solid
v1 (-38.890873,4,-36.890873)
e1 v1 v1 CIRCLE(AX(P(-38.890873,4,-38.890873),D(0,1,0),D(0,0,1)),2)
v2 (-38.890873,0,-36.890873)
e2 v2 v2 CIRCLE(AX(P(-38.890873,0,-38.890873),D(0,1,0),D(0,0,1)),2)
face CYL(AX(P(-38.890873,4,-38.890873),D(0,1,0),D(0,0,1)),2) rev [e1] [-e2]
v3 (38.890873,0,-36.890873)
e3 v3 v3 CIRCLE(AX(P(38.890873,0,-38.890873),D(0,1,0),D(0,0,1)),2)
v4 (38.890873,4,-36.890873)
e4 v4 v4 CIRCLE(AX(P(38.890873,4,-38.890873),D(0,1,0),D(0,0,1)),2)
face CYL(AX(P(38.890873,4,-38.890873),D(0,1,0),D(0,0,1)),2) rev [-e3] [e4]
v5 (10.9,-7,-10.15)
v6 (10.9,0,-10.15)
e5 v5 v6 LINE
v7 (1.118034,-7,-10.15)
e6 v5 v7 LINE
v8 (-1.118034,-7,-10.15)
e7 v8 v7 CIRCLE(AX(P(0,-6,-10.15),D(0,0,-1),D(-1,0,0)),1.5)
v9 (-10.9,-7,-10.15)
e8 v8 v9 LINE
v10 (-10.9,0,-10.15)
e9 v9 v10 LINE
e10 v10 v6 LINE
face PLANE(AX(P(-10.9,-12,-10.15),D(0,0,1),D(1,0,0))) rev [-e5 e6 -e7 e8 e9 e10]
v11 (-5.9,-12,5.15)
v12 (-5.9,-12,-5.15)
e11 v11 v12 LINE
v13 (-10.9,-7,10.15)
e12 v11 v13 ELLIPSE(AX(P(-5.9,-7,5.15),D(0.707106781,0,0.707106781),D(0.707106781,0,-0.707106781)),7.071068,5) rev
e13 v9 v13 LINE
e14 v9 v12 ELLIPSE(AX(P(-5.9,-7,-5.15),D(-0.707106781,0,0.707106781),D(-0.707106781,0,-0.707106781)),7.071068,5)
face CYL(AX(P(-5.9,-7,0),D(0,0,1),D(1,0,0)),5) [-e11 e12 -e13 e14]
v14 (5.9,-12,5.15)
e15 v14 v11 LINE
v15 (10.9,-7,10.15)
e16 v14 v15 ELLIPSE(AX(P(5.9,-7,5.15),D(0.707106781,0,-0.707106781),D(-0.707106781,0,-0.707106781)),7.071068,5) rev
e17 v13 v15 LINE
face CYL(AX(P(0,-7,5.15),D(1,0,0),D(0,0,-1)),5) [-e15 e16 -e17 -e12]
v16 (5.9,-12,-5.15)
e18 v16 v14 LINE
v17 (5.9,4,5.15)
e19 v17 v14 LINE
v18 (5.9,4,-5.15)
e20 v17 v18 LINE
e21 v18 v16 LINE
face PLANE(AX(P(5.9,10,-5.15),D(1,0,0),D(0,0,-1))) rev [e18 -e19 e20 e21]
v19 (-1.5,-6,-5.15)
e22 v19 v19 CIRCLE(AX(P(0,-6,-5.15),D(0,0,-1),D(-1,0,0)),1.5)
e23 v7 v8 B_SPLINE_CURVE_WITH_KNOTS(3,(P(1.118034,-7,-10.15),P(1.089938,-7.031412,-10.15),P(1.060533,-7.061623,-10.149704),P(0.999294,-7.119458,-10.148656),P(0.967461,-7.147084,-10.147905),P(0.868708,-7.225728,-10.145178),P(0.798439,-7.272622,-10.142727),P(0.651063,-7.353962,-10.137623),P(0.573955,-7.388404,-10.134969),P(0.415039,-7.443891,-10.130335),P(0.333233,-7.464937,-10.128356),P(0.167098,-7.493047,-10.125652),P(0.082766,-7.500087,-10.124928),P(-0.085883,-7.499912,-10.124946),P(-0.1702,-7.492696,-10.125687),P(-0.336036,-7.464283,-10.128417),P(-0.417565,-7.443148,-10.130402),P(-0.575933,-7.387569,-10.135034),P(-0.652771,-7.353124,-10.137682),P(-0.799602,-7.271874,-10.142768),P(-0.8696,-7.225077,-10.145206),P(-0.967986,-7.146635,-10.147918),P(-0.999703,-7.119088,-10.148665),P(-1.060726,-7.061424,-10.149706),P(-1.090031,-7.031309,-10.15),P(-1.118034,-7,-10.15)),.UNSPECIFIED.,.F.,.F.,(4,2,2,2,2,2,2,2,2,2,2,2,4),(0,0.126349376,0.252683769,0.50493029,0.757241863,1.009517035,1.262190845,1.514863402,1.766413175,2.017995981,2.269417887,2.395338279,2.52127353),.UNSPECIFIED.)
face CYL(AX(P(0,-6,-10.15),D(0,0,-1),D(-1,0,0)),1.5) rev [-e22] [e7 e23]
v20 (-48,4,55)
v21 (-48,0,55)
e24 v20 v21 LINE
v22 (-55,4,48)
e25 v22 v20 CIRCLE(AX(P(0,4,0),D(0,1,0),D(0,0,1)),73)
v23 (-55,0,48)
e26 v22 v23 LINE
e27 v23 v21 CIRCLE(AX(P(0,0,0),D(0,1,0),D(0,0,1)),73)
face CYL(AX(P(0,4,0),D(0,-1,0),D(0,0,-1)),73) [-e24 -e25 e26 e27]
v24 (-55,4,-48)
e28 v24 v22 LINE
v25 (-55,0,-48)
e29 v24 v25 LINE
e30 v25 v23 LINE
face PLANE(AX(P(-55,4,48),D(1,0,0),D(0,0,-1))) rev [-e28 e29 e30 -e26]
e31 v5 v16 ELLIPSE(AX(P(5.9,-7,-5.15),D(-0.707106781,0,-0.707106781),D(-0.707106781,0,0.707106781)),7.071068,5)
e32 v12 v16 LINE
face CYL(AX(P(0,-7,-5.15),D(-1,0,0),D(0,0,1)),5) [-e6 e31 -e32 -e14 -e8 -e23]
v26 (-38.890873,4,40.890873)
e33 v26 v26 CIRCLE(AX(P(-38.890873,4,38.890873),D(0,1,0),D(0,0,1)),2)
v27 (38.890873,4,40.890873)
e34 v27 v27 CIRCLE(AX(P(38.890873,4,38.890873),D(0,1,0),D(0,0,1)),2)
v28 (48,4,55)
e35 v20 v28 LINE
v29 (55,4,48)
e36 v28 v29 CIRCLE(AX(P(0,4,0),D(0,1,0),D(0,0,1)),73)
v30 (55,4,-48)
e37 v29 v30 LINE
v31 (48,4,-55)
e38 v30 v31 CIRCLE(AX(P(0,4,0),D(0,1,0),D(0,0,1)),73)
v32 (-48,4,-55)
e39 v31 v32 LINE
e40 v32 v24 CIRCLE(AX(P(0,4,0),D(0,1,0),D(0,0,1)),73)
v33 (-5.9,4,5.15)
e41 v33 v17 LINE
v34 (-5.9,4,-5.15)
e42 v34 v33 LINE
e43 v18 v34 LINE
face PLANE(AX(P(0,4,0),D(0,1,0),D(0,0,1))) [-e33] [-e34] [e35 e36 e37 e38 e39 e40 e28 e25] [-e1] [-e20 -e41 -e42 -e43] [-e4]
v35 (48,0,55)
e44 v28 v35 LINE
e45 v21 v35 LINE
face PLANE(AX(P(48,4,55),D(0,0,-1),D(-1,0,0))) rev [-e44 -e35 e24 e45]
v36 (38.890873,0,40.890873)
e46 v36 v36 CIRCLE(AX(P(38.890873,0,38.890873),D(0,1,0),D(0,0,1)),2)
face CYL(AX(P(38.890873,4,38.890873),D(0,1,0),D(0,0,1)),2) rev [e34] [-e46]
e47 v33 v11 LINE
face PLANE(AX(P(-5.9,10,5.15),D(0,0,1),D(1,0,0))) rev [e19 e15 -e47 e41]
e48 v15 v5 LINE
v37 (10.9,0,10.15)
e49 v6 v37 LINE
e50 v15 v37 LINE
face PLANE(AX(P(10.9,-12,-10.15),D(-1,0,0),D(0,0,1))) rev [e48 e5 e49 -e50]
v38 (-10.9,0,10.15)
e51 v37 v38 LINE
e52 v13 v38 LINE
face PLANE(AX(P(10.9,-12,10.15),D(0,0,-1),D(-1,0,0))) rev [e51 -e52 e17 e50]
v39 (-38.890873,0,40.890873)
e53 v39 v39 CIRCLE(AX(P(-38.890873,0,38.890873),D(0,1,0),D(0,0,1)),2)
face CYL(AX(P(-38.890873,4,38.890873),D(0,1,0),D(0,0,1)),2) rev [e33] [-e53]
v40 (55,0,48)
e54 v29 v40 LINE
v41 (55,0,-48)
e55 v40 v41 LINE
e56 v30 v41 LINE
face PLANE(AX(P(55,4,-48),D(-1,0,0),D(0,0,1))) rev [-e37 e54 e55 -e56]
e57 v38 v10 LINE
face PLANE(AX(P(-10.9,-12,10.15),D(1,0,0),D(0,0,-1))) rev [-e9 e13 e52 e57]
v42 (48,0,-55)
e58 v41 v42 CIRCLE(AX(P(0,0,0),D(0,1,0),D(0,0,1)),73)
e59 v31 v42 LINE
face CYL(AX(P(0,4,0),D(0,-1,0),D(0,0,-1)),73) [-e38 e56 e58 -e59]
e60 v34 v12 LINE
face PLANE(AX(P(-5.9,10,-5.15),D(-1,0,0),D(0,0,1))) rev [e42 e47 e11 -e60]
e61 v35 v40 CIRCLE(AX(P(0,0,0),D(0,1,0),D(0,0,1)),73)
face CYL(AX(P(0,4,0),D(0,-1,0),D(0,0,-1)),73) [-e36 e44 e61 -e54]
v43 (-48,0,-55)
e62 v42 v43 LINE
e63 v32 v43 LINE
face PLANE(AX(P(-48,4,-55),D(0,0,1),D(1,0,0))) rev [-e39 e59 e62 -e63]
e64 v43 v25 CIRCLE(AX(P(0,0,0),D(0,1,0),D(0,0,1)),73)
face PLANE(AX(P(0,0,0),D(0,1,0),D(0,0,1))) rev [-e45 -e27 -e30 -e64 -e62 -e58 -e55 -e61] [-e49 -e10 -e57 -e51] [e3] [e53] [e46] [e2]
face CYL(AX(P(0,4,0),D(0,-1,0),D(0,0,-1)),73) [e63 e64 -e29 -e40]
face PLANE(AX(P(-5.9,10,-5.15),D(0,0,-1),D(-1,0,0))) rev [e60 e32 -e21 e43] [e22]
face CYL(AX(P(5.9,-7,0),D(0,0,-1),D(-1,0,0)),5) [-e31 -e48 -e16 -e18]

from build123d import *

# Parameters (mm, degrees)
BOSS_EXTRUDE1_DEPTH       = 4
F_4_0MM_DOWEL_HOLE2_D     = 4
SKETCH7_W                 = 11.8
SKETCH7_H                 = 10.3
CUT_EXTRUDE1_DEPTH        = 10
SKETCH8_W                 = 21.8
SKETCH8_H                 = 20.3
SKETCH8_W_2               = 11.8
SKETCH8_H_2               = 10.3
BOSS_EXTRUDE2_DEPTH       = 12
FILLET1_START             = -10.15
FILLET1_DEPTH             = 20.3
FILLET1_START_2           = -12
FILLET1_2_DEPTH           = 24
F_3_0MM_DOWEL_HOLE1_D     = 3
F_3_0MM_DOWEL_HOLE1_DEPTH = 5


with BuildPart() as part:
    # Sketch1 → Boss-Extrude1 (new body)
    with BuildSketch(Plane(origin=(0, 0, 0), x_dir=(1, 0, 0), z_dir=(0, 1, 0))):
        with BuildLine():
            Line((55, 48), (55, -48))
            ThreePointArc((55, -48), (51.618795027, -51.618795027), (48, -55))
            Line((48, -55), (-48, -55))
            ThreePointArc((-48, -55), (-51.618795027, -51.618795027), (-55, -48))
            Line((-55, -48), (-55, 48))
            ThreePointArc((-55, 48), (-51.618795027, 51.618795027), (-48, 55))
            Line((-48, 55), (48, 55))
            ThreePointArc((48, 55), (51.618795027, 51.618795027), (55, 48))
        make_face()
    extrude(amount=BOSS_EXTRUDE1_DEPTH)

    # Ø4.0mm Dowel Hole2 (through all)
    with Locations(Plane(origin=(0, 4, 0), x_dir=(1, 0, 0), z_dir=(0, 1, 0))):
        with Locations((38.890872965, 38.890872965), (38.890872965, -38.890872965), (-38.890872965, -38.890872965), (-38.890872965, 38.890872965)):
            Hole(F_4_0MM_DOWEL_HOLE2_D / 2)

    # Sketch7 → Cut-Extrude1 (cut)
    with BuildSketch(Plane.XZ):
        Rectangle(SKETCH7_W, SKETCH7_H)
    extrude(amount=-CUT_EXTRUDE1_DEPTH, mode=Mode.SUBTRACT)

    # Sketch8 → Boss-Extrude2 (add)
    with BuildSketch(Plane.XZ):
        Rectangle(SKETCH8_W, SKETCH8_H)
        Rectangle(SKETCH8_W_2, SKETCH8_H_2, mode=Mode.SUBTRACT)
    extrude(amount=BOSS_EXTRUDE2_DEPTH)

    # Fillet1: read off the stored shape, not the designer's step
    # Fillet1 outline → Fillet1 (cut)
    with BuildSketch(Plane.XY.offset(FILLET1_START)):
        with BuildLine():
            Line((10.9, -12), (10.9, -7))
            ThreePointArc((10.9, -7), (9.435533906, -10.535533906), (5.9, -12))
            Line((5.9, -12), (10.9, -12))
        make_face()
        with BuildLine():
            Line((-10.9, -12), (-5.9, -12))
            ThreePointArc((-5.9, -12), (-9.435533906, -10.535533906), (-10.9, -7))
            Line((-10.9, -7), (-10.9, -12))
        make_face()
    extrude(amount=FILLET1_DEPTH, mode=Mode.SUBTRACT)

    # Fillet1 2 outline → Fillet1 2 (cut)
    with BuildSketch(Plane.YZ.offset(FILLET1_START_2)):
        with BuildLine():
            ThreePointArc((-12, 5.15), (-10.535533906, 8.685533906), (-7, 10.15))
            Line((-7, 10.15), (-12, 10.15))
            Line((-12, 10.15), (-12, 5.15))
        make_face()
        with BuildLine():
            Line((-12, -10.15), (-7, -10.15))
            ThreePointArc((-7, -10.15), (-10.535533906, -8.685533906), (-12, -5.15))
            Line((-12, -5.15), (-12, -10.15))
        make_face()
    extrude(amount=FILLET1_2_DEPTH, mode=Mode.SUBTRACT)

    # Ø3.0mm Dowel Hole1
    with Locations(Plane(origin=(0, 0, -10.15), x_dir=(-1, 0, 0), z_dir=(0, 0, -1))):
        with Locations((0, -6)):
            Hole(F_3_0MM_DOWEL_HOLE1_D / 2, depth=F_3_0MM_DOWEL_HOLE1_DEPTH)


solid = part.part
